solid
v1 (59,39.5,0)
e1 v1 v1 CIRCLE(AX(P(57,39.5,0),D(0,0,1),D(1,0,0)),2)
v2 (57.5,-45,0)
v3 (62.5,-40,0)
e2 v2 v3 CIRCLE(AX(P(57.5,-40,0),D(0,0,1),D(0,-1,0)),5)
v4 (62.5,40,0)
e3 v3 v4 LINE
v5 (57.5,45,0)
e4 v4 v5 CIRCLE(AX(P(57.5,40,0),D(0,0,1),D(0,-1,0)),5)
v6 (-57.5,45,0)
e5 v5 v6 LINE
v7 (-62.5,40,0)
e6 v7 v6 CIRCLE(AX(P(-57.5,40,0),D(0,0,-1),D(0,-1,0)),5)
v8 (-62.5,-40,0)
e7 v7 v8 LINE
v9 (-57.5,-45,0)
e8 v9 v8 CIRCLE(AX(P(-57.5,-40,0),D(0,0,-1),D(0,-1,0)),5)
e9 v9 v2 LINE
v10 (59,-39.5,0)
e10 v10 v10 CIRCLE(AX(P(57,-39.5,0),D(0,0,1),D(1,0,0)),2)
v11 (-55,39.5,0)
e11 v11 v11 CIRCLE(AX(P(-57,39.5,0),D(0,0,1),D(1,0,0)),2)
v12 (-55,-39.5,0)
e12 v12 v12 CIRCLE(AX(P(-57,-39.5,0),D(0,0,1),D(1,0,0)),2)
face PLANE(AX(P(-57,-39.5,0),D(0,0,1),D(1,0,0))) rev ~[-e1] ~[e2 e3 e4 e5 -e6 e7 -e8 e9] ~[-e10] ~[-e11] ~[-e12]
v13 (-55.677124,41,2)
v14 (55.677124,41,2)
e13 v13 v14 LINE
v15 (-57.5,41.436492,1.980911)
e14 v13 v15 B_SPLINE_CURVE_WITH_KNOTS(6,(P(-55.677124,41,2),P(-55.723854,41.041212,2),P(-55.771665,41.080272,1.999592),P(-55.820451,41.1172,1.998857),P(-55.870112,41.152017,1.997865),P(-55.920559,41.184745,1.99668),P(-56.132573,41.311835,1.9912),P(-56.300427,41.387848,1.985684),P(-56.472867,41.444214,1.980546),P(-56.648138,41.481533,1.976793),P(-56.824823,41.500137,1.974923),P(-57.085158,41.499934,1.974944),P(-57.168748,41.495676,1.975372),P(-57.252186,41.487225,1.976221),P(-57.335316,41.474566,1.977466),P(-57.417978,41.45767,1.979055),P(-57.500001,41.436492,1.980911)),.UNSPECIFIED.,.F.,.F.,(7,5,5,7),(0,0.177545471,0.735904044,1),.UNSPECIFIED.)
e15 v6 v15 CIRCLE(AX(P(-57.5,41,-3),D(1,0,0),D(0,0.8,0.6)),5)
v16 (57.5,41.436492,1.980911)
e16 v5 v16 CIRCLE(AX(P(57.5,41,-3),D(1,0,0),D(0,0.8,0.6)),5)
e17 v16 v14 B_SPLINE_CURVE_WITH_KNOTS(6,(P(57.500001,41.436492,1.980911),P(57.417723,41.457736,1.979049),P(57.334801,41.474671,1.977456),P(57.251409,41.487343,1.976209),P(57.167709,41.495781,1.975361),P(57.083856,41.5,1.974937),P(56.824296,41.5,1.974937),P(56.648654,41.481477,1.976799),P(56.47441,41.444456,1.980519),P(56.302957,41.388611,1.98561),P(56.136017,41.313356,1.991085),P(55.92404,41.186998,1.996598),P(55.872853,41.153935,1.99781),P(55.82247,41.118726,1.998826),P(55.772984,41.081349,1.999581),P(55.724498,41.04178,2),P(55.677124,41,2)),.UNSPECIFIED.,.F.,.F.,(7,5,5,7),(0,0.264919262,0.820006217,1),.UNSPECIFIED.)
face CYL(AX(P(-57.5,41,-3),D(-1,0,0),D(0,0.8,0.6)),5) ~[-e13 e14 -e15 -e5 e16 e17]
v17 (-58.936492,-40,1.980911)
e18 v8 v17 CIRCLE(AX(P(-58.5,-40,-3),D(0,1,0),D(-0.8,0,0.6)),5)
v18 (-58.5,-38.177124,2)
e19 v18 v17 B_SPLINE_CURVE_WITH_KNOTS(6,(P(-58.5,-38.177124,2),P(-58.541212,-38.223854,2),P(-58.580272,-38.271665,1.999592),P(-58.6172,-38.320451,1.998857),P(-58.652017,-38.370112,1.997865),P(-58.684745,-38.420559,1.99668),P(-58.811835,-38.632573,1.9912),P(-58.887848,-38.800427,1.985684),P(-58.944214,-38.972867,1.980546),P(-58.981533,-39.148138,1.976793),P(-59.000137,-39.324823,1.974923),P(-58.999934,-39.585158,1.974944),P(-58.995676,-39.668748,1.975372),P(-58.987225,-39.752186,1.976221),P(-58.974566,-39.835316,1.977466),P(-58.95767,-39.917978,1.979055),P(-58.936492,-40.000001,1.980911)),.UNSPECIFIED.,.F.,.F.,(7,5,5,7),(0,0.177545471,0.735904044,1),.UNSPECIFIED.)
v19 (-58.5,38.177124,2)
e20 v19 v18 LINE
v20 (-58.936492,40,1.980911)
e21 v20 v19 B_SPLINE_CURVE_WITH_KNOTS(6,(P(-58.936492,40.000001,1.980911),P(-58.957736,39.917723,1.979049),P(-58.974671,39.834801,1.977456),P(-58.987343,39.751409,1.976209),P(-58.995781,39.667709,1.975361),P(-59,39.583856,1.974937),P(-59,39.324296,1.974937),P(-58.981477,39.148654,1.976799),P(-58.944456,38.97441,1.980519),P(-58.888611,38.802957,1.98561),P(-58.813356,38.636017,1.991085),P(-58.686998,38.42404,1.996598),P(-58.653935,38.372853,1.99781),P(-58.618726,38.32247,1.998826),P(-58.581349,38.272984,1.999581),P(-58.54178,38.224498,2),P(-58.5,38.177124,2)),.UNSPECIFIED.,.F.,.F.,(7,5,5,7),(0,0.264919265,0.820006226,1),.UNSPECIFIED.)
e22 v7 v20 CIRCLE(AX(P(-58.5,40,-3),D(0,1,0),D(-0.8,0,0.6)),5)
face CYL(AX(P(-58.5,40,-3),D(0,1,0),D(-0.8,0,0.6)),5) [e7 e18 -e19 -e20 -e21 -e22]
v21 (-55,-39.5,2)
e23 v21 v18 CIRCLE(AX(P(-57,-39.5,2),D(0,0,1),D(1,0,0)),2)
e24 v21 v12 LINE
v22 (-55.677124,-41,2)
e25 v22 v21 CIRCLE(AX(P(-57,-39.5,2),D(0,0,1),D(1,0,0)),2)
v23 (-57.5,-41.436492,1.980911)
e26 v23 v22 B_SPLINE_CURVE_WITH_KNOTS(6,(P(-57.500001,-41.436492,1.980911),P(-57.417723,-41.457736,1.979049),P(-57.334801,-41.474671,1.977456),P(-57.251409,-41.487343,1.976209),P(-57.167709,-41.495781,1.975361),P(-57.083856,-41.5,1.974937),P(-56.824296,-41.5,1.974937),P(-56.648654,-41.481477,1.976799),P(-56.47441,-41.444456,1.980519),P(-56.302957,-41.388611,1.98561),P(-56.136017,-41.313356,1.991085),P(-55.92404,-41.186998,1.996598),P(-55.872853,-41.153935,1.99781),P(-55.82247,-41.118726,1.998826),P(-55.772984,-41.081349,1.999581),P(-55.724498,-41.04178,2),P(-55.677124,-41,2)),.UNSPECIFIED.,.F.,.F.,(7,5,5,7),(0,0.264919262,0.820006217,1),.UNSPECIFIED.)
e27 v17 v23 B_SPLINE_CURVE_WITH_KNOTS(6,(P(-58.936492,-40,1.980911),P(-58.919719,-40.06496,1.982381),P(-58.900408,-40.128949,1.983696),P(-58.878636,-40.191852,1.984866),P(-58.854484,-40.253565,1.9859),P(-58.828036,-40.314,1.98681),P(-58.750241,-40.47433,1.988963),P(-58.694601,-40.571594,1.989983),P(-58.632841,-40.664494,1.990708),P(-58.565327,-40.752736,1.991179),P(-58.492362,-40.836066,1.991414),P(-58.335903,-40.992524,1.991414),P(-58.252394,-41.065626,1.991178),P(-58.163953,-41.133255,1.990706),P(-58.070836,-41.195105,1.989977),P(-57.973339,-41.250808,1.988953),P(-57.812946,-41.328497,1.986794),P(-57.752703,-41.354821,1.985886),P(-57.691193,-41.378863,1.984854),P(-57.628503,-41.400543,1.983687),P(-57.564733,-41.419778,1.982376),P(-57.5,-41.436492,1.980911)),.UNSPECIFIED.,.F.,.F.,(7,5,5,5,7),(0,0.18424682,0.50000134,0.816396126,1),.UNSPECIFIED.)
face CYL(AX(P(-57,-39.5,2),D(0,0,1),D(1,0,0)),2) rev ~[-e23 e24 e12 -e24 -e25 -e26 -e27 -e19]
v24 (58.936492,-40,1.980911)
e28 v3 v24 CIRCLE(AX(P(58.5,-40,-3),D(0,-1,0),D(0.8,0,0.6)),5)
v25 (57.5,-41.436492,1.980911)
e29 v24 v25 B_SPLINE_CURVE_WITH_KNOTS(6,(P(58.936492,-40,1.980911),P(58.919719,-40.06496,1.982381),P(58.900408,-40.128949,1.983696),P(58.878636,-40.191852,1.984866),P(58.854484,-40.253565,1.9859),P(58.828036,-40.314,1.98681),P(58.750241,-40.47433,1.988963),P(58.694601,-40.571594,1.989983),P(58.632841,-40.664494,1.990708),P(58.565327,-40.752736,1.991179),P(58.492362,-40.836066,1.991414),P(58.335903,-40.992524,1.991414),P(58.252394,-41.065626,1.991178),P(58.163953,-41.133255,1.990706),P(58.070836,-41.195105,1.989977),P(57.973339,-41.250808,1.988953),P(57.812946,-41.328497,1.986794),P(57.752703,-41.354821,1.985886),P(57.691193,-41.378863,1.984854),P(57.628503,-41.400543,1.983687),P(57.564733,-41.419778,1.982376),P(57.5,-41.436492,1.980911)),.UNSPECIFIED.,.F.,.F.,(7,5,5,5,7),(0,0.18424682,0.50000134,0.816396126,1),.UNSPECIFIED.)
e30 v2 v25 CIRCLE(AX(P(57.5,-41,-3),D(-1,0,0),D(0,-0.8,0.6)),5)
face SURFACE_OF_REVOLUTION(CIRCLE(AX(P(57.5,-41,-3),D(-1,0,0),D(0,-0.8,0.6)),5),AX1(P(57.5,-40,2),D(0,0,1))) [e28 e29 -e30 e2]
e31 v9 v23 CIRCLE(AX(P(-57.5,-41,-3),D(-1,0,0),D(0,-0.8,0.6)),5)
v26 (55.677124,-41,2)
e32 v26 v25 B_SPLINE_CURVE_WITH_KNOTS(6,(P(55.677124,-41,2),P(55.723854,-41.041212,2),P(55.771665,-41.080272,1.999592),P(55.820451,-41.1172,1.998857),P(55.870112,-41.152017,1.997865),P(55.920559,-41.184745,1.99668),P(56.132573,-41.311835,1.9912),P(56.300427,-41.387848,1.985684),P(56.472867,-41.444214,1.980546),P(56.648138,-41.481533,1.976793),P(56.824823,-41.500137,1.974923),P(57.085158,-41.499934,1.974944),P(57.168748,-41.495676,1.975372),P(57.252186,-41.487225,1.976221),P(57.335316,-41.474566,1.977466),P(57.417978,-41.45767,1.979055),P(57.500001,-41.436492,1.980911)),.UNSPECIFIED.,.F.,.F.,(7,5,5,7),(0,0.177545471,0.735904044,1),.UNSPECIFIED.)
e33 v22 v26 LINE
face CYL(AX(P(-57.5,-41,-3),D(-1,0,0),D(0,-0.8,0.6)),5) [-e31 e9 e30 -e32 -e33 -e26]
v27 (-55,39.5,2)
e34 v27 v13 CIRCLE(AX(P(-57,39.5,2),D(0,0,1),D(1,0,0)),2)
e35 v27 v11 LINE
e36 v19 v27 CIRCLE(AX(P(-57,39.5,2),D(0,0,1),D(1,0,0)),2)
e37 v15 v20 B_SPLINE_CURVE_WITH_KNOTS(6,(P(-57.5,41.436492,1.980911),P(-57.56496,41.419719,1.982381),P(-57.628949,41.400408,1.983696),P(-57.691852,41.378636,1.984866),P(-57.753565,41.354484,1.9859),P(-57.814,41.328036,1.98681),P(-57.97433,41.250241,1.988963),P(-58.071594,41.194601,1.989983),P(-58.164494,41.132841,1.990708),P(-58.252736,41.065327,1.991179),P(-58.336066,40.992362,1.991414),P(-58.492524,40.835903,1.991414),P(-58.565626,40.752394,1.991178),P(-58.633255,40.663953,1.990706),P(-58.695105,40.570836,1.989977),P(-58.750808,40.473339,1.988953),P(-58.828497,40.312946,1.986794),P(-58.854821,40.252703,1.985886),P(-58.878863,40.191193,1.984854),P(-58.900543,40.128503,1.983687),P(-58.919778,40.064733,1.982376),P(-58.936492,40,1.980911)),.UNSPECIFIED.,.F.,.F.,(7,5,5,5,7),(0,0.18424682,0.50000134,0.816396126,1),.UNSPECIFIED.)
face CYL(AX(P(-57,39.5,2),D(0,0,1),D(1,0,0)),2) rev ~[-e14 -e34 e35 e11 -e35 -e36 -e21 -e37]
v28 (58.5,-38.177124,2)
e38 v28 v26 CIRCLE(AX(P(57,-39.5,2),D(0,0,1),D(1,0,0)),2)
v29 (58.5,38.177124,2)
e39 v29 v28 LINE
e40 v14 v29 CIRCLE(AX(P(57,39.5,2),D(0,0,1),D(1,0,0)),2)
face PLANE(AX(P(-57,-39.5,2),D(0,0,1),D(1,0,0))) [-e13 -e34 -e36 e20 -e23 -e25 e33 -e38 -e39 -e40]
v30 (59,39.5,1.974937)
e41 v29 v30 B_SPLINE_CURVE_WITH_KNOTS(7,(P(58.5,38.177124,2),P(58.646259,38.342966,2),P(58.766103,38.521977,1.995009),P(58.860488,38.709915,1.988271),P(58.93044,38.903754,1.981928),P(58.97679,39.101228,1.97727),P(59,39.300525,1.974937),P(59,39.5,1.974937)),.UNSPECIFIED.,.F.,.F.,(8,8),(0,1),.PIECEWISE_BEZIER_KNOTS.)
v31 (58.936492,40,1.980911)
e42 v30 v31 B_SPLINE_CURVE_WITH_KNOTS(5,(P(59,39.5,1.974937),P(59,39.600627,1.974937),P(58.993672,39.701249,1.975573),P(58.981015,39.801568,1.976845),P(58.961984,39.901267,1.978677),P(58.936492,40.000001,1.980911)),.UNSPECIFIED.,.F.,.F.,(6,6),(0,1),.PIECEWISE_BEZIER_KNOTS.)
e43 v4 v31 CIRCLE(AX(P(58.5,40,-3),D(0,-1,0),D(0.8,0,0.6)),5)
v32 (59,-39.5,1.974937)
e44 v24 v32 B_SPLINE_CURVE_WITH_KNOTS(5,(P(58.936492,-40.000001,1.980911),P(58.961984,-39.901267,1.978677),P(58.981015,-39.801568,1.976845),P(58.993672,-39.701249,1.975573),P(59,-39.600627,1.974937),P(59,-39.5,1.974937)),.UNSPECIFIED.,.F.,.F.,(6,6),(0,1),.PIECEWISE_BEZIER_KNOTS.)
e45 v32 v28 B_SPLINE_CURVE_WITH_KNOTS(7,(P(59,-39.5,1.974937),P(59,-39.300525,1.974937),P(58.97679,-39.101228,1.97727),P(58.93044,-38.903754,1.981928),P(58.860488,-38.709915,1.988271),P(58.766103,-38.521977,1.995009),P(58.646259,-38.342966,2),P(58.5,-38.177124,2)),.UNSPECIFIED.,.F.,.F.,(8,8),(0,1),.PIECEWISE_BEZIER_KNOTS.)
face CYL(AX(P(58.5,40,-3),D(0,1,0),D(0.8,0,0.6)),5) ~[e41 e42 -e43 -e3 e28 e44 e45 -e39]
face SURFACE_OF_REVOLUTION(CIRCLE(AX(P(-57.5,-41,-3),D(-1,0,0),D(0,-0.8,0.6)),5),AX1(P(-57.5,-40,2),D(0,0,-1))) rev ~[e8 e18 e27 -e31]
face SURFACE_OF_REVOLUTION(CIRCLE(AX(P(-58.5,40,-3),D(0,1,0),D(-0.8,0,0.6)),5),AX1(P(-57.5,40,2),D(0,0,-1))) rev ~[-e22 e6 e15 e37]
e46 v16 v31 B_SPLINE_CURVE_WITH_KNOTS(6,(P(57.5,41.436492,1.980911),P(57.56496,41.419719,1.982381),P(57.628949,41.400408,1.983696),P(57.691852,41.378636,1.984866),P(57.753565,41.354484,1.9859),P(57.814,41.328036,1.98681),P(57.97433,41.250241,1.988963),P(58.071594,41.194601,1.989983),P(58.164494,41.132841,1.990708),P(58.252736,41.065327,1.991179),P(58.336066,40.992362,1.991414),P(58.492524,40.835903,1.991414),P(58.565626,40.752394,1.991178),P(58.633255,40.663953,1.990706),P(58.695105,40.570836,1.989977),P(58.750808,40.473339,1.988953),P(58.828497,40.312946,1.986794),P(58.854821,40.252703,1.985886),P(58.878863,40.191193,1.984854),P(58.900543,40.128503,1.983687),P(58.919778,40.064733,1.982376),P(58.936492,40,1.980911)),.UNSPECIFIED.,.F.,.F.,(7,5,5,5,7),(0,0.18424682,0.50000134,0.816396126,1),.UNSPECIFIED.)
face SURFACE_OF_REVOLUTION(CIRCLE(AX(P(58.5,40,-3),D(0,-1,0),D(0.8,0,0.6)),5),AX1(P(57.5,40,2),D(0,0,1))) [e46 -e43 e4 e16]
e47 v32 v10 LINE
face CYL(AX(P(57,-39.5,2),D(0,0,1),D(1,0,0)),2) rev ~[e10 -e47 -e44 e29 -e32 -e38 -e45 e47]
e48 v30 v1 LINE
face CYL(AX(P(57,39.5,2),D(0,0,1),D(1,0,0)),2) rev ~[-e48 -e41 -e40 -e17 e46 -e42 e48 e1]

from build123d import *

# Parameters (mm, degrees)
F1_DEPTH     = 2
F0_W         = 2
F0_H         = 68
F0_W_2       = 103
F0_H_2       = 2
F2_DEPTH     = 2
F3_R         = 2
F4_DEPTH     = 5
F5_R         = 5
F6_T1_DEPTH  = 80
F6_T3_DEPTH  = 115
F6_T6_ANGLE  = 90
F6_T8_ANGLE  = 90
F6_T10_ANGLE = 90
F6_T12_ANGLE = 90


# Not quite as in the source:
# - a fillet or chamfer that OpenCascade refuses, or shapes differently, is made with other operations: its cross-section is extruded or revolved along the edge and cut away or added


with BuildPart() as f1:
    # F0 (on Top) → F1 (new body)
    with BuildSketch(Plane.XY):
        Polygon((-51.5, -43), (51.5, -43), (51.5, -34), (60.5, -34), (60.5, 34), (51.5, 34), (51.5, 43), (-51.5, 43), (-51.5, 34), (-60.5, 34), (-60.5, -34), (-51.5, -34), align=None)
    extrude(amount=F1_DEPTH)

    # F0 (on Top) → F2 (join)
    with BuildSketch(Plane.XY):
        Polygon((-62.5, -45), (-51.5, -45), (-51.5, -43), (-51.5, -34), (-60.5, -34), (-62.5, -34), align=None)
        with Locations((-61.5, 0)):
            Rectangle(F0_W, F0_H)
        with Locations((0, -44)):
            Rectangle(F0_W_2, F0_H_2)
        Polygon((51.5, -45), (62.5, -45), (62.5, -34), (60.5, -34), (51.5, -34), (51.5, -43), align=None)
        with Locations((61.5, 0)):
            Rectangle(F0_W, F0_H)
        Polygon((60.5, 34), (62.5, 34), (62.5, 45), (51.5, 45), (51.5, 43), (51.5, 34), align=None)
        with Locations((0, 44)):
            Rectangle(F0_W_2, F0_H_2)
        Polygon((-62.5, 45), (-62.5, 34), (-60.5, 34), (-51.5, 34), (-51.5, 43), (-51.5, 45), align=None)
    extrude(amount=F2_DEPTH)

    # F3 (on face) → F4 (cut)
    with BuildSketch(Plane.XY.offset(2)):
        with Locations((-57, -39.5)):
            Circle(F3_R)
        with Locations((57, -39.5)):
            Circle(F3_R)
        with Locations((-57, 39.5)):
            Circle(F3_R)
        with Locations((57, 39.5)):
            Circle(F3_R)
    extrude(amount=-F4_DEPTH, mode=Mode.SUBTRACT)

    # F5
    f5_edges = [f1.edges().sort_by_distance(p)[0] for p in [
        (-62.5, 45, 1),
        (62.5, 45, 1),
        (62.5, -45, 1),
        (-62.5, -45, 1),
    ]]
    fillet(f5_edges, radius=F5_R)

    # F6: fillet of radius 5 on 1 edges, made by hand

    # F6_s2 → F6_t1 (cut)
    with BuildSketch(Plane.XZ.offset(-40)):
        with BuildLine():
            ThreePointArc((-62.5, 0), (-60.7360679775, 1.472135955), (-58.5, 2))
            Line((-58.5, 2), (-62.5, 2))
            Line((-62.5, 2), (-62.5, 0))
        make_face()
        with BuildLine():
            ThreePointArc((62.5, 0), (60.7360679775, 1.472135955), (58.5, 2))
            Line((58.5, 2), (62.5, 2))
            Line((62.5, 2), (62.5, 0))
        make_face()
    extrude(amount=F6_T1_DEPTH, mode=Mode.SUBTRACT)

    # F6_s4 → F6_t3 (cut)
    with BuildSketch(Plane.YZ.offset(-57.5)):
        with BuildLine():
            ThreePointArc((-45, 0), (-43.2360679775, 1.472135955), (-41, 2))
            Line((-41, 2), (-45, 2))
            Line((-45, 2), (-45, 0))
        make_face()
        with BuildLine():
            ThreePointArc((45, 0), (43.2360679775, 1.472135955), (41, 2))
            Line((41, 2), (45, 2))
            Line((45, 2), (45, 0))
        make_face()
    extrude(amount=F6_T3_DEPTH, mode=Mode.SUBTRACT)

    # F6_s5 → F6_t6 (revolve, cut)
    with BuildSketch(Plane.XZ.offset(-40)):
        with BuildLine():
            ThreePointArc((-62.5, 0), (-60.7360679775, 1.472135955), (-58.5, 2))
            Line((-58.5, 2), (-62.5, 2))
            Line((-62.5, 2), (-62.5, 0))
        make_face()
    revolve(axis=Axis((-57.5, 40, 2), (0, 0, -1)), revolution_arc=F6_T6_ANGLE, mode=Mode.SUBTRACT)

    # F6_s7 → F6_t8 (revolve, cut)
    with BuildSketch(Plane.YZ.offset(-57.5)):
        with BuildLine():
            ThreePointArc((-45, 0), (-43.2360679775, 1.472135955), (-41, 2))
            Line((-41, 2), (-45, 2))
            Line((-45, 2), (-45, 0))
        make_face()
    revolve(axis=Axis((-57.5, -40, 2), (0, 0, -1)), revolution_arc=F6_T8_ANGLE, mode=Mode.SUBTRACT)

    # F6_s9 → F6_t10 (revolve, cut)
    with BuildSketch(Plane.YZ.offset(57.5)):
        with BuildLine():
            ThreePointArc((-45, 0), (-43.2360679775, 1.472135955), (-41, 2))
            Line((-41, 2), (-45, 2))
            Line((-45, 2), (-45, 0))
        make_face()
    revolve(axis=Axis((57.5, -40, 2), (0, 0, 1)), revolution_arc=F6_T10_ANGLE, mode=Mode.SUBTRACT)

    # F6_s11 → F6_t12 (revolve, cut)
    with BuildSketch(Plane.XZ.offset(-40)):
        with BuildLine():
            ThreePointArc((62.5, 0), (60.7360679775, 1.472135955), (58.5, 2))
            Line((58.5, 2), (62.5, 2))
            Line((62.5, 2), (62.5, 0))
        make_face()
    revolve(axis=Axis((57.5, 40, 2), (0, 0, 1)), revolution_arc=F6_T12_ANGLE, mode=Mode.SUBTRACT)


solid = f1.part
